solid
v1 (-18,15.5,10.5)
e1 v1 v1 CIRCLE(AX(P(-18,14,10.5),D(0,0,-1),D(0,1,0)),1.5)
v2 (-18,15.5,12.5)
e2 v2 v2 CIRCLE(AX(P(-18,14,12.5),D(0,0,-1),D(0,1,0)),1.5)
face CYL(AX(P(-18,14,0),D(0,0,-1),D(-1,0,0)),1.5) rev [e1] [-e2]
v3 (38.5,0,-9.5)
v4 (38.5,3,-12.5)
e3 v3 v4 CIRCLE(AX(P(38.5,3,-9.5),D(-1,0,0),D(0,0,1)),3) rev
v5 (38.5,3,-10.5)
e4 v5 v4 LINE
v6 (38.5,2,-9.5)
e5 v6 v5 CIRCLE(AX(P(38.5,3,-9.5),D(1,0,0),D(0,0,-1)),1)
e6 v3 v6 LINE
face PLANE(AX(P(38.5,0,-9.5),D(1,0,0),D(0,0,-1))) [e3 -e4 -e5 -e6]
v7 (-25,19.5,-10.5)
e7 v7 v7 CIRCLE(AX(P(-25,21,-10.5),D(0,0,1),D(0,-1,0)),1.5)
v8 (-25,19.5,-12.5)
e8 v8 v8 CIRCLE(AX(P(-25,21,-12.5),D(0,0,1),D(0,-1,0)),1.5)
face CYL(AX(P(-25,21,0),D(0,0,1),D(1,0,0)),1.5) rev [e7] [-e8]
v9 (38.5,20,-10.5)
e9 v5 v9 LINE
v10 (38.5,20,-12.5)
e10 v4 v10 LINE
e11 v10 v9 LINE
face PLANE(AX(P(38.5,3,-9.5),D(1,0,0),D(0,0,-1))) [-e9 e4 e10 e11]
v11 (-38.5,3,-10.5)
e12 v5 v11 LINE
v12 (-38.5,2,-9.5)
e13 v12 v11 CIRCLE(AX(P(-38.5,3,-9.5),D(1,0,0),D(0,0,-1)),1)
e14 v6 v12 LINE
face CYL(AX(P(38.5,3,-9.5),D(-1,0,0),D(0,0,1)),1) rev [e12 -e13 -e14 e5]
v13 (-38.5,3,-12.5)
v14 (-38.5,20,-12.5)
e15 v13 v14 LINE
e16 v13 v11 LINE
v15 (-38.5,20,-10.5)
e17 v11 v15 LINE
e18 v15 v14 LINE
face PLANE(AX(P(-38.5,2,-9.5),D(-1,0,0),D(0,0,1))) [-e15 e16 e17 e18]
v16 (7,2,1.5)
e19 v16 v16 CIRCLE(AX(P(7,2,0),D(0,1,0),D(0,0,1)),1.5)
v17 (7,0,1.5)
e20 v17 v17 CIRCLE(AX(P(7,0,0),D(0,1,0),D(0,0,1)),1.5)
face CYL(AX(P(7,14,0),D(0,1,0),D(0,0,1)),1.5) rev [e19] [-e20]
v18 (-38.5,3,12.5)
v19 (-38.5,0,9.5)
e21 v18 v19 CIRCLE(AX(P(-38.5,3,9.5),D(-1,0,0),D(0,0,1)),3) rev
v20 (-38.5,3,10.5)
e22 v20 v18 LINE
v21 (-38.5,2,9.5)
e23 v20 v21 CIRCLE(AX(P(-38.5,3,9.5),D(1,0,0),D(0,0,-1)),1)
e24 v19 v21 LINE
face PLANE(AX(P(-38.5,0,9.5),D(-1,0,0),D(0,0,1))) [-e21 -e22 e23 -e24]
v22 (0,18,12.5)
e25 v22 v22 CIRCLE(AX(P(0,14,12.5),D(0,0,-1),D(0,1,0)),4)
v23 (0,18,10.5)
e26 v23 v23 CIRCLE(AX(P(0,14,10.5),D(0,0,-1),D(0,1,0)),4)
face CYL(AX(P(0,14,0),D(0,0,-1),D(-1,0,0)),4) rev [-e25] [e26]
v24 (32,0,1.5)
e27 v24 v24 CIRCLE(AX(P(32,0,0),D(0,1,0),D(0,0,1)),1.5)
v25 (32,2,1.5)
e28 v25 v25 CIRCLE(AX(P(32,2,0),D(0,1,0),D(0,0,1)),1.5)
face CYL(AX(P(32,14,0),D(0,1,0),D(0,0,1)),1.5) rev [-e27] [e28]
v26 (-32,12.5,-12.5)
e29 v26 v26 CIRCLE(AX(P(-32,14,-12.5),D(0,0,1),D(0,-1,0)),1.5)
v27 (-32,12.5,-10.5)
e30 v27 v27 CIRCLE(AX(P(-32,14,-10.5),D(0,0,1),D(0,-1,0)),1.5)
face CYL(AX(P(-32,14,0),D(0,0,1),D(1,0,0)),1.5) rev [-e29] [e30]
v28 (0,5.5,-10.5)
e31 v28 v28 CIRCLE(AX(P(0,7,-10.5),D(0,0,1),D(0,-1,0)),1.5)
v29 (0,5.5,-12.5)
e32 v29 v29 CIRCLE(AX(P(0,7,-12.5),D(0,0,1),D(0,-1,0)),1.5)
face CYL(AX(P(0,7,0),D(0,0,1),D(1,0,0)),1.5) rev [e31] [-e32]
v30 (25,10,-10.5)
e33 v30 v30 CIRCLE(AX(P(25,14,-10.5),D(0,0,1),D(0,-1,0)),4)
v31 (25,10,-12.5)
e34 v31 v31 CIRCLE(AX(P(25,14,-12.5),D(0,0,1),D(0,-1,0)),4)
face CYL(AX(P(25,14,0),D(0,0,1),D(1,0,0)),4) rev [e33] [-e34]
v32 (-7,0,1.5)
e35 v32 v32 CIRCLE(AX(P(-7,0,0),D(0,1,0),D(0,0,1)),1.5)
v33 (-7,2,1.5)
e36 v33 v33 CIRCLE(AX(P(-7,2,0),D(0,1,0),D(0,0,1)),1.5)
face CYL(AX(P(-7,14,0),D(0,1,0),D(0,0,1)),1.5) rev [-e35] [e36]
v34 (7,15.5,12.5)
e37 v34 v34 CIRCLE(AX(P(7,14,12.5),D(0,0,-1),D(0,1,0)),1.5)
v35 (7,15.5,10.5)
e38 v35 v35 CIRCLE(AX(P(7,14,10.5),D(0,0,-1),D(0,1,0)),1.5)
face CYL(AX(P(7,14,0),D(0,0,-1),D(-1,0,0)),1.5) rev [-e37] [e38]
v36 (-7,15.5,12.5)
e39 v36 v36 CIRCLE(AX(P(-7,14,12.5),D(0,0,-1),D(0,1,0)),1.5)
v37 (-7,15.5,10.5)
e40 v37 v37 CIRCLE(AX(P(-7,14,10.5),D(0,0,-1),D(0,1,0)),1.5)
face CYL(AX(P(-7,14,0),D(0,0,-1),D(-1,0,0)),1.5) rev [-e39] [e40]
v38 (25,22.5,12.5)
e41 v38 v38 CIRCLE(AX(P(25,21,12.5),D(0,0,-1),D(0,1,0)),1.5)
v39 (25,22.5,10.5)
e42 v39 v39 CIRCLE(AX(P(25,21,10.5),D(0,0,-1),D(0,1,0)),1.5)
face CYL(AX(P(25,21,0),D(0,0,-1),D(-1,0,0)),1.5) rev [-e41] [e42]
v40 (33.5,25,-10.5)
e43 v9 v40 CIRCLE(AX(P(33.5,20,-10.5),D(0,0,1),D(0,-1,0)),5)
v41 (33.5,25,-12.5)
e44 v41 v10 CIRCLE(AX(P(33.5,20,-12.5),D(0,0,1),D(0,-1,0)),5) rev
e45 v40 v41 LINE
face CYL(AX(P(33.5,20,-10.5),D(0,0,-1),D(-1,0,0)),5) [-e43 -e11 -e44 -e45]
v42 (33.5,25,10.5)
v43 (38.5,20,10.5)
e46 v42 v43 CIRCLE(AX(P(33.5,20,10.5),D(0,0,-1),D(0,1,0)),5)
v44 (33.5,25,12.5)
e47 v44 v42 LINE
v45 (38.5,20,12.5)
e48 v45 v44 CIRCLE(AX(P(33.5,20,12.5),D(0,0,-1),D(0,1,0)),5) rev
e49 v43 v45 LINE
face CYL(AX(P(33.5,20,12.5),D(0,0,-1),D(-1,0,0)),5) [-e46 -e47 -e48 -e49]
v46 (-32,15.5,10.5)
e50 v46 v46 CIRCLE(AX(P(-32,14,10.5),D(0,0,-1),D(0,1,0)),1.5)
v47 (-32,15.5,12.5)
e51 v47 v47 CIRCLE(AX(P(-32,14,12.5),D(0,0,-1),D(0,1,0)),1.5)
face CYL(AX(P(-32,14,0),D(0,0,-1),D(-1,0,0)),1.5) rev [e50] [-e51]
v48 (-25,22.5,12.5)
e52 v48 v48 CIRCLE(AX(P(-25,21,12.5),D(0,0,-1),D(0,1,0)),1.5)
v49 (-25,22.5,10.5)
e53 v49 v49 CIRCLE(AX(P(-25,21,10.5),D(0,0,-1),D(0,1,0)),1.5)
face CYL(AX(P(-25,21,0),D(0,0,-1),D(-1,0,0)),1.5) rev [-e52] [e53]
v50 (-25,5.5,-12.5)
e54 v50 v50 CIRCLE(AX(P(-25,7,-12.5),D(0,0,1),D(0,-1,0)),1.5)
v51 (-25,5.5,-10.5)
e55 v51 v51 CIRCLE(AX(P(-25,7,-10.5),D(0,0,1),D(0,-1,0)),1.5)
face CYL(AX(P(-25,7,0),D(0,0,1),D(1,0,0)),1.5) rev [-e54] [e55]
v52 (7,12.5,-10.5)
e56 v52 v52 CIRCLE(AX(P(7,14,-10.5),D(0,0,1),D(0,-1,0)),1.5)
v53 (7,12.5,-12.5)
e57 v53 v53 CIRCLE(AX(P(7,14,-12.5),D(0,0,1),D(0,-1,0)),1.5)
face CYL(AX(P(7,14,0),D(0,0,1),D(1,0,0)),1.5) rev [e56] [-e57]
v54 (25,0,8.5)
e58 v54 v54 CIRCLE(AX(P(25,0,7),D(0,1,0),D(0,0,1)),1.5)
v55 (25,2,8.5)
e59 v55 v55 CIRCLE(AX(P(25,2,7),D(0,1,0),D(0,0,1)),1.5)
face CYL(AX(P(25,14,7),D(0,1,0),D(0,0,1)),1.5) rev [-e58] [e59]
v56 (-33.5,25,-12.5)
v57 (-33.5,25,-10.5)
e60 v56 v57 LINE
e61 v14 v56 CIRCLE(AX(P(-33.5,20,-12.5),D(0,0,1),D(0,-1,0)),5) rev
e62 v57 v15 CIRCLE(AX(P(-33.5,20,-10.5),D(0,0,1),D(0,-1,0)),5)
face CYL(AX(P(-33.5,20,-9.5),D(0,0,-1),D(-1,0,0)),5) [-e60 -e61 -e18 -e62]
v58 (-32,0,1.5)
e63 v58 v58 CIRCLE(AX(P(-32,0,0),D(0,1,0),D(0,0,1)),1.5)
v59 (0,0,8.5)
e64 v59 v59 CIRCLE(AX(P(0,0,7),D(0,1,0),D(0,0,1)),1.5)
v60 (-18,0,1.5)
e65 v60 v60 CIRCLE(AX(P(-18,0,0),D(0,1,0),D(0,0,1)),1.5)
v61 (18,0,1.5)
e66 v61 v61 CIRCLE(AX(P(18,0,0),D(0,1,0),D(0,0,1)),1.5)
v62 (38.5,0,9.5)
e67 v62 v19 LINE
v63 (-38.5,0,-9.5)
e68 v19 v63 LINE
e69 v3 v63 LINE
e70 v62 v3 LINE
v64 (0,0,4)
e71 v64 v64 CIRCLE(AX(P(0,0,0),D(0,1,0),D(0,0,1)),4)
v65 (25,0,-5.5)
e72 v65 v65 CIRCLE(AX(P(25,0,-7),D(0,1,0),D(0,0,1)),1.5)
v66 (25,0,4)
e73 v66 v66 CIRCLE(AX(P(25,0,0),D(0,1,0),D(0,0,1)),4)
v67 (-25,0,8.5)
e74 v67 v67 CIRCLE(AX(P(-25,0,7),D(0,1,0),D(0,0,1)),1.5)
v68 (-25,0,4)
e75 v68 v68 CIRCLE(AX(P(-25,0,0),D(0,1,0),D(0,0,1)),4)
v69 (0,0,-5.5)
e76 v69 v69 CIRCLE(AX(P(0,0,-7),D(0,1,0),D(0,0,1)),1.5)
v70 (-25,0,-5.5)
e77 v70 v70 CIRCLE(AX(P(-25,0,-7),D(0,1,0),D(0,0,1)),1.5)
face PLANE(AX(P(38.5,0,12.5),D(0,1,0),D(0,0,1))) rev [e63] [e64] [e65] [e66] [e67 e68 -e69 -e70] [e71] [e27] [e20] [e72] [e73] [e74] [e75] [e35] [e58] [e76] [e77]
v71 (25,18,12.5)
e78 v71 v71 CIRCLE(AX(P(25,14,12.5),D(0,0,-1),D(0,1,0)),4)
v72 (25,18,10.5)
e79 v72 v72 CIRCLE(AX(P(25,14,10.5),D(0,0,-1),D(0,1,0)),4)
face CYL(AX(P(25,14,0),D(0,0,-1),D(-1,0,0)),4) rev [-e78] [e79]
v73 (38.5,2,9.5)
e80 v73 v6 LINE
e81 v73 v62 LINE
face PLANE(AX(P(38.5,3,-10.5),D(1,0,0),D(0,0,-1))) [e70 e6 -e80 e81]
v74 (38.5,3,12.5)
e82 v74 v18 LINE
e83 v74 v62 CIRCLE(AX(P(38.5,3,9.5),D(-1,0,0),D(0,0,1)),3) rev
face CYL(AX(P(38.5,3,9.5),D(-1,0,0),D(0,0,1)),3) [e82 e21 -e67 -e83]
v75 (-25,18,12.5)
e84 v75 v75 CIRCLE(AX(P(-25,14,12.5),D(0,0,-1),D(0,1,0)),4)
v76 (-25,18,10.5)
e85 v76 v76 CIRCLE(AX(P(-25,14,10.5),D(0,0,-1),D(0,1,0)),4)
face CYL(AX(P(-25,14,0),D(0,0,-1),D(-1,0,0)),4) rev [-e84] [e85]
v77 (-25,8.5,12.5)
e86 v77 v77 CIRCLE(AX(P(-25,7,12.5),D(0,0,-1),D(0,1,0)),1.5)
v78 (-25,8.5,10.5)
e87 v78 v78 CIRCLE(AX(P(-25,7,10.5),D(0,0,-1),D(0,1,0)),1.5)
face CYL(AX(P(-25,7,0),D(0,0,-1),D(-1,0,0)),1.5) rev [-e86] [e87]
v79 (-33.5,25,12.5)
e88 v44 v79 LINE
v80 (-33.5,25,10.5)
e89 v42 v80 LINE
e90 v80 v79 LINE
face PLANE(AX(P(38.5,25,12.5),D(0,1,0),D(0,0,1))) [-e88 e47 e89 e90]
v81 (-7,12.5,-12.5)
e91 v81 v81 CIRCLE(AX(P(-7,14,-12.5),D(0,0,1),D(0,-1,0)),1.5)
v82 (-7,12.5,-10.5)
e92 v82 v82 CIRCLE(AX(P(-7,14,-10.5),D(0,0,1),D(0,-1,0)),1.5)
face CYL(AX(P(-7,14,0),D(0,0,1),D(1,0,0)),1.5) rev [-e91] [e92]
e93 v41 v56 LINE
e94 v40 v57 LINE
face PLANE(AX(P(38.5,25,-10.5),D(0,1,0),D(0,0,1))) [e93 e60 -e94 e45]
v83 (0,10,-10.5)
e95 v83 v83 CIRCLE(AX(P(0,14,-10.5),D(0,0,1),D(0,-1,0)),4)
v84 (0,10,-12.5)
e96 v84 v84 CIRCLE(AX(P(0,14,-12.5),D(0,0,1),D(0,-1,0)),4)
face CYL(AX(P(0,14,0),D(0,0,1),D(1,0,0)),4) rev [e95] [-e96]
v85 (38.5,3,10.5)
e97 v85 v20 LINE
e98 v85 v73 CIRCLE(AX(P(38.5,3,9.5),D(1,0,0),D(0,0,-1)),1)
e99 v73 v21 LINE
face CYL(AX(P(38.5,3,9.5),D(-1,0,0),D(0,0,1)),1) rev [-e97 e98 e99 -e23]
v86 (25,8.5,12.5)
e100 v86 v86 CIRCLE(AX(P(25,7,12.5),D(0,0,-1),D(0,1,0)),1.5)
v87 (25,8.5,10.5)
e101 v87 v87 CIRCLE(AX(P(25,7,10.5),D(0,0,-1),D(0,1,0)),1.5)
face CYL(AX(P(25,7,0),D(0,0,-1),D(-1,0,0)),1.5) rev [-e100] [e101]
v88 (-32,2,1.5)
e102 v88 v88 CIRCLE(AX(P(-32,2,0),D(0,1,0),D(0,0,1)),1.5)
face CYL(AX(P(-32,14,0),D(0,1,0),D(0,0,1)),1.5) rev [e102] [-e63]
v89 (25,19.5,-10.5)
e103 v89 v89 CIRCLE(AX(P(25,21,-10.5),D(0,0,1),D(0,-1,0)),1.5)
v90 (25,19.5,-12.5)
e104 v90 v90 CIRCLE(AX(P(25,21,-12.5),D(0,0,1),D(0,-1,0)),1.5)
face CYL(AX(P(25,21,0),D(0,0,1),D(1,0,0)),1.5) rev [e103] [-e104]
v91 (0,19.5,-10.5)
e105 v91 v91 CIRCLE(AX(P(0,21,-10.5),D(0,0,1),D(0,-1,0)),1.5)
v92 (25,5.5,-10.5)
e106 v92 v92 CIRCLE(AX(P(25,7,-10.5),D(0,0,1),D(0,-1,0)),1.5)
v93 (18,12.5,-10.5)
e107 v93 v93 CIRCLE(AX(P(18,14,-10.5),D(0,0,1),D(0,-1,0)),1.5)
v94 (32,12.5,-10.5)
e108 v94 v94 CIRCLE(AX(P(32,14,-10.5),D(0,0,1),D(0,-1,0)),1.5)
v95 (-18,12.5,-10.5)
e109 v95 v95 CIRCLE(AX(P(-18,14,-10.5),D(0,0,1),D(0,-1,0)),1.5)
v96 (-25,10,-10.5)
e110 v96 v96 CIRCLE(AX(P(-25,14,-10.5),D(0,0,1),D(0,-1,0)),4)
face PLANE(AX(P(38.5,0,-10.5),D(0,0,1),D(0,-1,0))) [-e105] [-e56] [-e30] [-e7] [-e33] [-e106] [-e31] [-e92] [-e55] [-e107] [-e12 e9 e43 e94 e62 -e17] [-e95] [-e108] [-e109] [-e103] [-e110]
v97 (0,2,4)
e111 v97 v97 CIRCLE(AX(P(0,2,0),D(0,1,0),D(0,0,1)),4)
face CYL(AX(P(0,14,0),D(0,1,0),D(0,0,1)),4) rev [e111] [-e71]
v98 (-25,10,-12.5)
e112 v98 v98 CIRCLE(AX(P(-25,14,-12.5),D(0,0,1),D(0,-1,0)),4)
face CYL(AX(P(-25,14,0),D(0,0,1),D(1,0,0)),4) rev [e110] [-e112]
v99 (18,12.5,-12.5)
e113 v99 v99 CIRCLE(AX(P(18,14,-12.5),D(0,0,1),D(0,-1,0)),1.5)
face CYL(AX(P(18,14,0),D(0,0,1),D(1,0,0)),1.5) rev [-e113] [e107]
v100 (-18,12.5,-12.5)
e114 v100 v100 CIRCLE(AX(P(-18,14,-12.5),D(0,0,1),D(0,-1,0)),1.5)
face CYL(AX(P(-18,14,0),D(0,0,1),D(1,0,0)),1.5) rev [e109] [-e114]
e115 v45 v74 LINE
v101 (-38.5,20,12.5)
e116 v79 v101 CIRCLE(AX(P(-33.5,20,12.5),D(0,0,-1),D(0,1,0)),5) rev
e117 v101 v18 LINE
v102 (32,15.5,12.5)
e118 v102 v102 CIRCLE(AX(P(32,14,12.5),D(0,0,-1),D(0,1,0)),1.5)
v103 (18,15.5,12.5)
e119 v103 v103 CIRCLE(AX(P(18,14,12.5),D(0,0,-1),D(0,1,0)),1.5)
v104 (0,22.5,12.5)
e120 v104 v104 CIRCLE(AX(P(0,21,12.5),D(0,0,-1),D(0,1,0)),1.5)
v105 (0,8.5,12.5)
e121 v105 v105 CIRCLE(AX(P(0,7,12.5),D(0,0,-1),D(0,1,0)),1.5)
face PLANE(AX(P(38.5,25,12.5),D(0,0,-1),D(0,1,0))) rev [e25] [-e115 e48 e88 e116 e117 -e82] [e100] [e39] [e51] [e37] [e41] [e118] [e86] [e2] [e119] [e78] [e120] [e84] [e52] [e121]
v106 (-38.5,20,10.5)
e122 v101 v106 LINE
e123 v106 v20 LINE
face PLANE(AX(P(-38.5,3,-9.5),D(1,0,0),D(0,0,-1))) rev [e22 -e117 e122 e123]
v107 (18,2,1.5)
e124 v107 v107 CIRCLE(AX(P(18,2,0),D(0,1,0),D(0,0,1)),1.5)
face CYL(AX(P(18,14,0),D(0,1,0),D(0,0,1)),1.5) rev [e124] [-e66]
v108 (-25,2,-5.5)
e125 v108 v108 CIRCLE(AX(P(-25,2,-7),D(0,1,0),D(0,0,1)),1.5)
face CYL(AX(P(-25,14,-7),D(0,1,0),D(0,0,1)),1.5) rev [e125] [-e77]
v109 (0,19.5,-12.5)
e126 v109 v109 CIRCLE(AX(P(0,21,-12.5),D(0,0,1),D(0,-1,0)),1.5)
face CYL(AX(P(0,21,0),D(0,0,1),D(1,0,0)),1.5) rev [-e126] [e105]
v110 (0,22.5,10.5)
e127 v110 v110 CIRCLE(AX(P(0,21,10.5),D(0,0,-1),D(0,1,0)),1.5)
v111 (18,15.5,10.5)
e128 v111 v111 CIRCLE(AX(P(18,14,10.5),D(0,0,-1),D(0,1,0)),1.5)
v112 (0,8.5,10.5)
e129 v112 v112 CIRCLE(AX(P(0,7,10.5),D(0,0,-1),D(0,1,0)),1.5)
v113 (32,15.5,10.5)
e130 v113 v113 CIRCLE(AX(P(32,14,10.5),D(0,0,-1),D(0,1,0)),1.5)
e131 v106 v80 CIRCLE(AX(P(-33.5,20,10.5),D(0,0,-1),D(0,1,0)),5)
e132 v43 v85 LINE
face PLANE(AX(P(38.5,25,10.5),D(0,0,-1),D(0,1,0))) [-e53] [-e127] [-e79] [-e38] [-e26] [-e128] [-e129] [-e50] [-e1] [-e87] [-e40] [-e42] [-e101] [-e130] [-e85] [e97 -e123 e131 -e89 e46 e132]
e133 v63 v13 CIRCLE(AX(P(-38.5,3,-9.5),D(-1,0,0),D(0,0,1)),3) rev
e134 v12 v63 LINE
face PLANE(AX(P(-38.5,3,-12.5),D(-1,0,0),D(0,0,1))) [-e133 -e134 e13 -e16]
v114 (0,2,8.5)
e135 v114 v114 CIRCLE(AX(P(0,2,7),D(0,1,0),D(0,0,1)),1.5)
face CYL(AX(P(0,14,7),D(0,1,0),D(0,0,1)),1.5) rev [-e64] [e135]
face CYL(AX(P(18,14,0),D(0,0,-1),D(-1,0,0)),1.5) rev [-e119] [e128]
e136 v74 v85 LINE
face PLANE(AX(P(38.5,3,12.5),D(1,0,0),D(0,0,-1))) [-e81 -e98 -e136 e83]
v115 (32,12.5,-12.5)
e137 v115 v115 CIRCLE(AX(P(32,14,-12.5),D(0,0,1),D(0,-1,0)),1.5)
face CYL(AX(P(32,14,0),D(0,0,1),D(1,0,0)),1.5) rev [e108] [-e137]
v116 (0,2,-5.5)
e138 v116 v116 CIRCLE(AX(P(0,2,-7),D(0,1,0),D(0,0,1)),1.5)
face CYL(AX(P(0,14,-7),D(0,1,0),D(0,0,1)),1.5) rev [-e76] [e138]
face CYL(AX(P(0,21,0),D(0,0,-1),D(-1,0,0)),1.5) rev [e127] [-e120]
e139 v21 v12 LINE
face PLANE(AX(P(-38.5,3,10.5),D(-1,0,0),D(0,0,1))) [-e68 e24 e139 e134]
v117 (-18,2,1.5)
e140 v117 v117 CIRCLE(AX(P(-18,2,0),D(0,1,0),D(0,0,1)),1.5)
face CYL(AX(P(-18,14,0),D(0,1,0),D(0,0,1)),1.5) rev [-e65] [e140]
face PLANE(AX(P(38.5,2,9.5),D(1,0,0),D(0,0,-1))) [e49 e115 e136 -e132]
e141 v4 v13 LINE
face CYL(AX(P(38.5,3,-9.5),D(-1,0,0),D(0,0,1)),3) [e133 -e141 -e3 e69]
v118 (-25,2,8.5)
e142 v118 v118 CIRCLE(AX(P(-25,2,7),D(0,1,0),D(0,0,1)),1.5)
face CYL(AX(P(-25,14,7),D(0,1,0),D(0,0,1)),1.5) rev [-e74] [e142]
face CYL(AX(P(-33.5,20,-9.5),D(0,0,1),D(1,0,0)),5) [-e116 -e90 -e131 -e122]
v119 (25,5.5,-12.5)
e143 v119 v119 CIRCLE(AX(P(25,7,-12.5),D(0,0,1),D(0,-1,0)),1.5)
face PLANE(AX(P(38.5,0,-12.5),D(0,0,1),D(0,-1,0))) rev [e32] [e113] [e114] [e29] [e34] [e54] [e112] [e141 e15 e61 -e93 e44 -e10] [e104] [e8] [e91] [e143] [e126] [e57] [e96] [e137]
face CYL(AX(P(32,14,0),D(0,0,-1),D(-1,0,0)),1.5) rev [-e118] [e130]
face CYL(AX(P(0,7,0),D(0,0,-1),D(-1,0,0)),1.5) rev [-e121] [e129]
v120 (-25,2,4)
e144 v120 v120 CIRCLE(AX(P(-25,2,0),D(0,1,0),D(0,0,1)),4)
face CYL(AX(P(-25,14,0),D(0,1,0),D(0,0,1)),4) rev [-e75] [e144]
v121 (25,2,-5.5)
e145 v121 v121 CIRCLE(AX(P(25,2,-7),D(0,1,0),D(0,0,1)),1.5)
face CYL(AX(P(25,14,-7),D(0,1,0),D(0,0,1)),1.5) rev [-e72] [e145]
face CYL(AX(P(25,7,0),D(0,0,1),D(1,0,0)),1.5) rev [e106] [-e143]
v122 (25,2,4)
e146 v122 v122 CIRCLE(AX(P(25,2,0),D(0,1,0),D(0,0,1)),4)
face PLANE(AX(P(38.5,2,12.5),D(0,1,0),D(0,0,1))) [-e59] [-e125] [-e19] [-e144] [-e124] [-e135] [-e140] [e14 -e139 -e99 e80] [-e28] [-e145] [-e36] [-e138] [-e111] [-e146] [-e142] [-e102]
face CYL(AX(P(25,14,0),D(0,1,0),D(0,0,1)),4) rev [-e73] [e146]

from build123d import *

# Parameters (mm, degrees)
T_LE_DE_BASE_PLI_E1_DEPTH              = 38.5
ESQUISSE7_W                            = 4
ESQUISSE7_H                            = 12.501
ESQUISSE12_W                           = 1.5
ESQUISSE12_H                           = 12.501
DIAM_TRE_DU_PER_AGE_3_0_3_1_AT_2_COUNT = 2
DIAM_TRE_DU_PER_AGE_3_0_3_1_AT_2_PITCH = 9.899494937
DIAM_TRE_DU_PER_AGE_3_0_3_1_AT_3_COUNT = 2
DIAM_TRE_DU_PER_AGE_3_0_3_1_AT_3_PITCH = 14
DIAM_TRE_DU_PER_AGE_3_0_3_1_AT_4_COUNT = 2
DIAM_TRE_DU_PER_AGE_3_0_3_1_AT_4_PITCH = 9.899494937
R_P_TITION_START                       = 10.5
R_P_TITION_CIRCULAIRE1_OUTLINE_R       = 4
R_P_TITION_CIRCULAIRE1_OUTLINE_R_2     = 1.5
R_P_TITION_CIRCULAIRE1_DEPTH           = 2
R_P_TITION_CIRCULAIRE1_2_OUTLINE_R     = 4
R_P_TITION_CIRCULAIRE1_2_OUTLINE_R_2   = 1.5
R_P_TITION_CIRCULAIRE1_2_DEPTH         = 2
R_P_TITION_LIN_AIRE1_COUNT             = 3
R_P_TITION_LIN_AIRE1_PITCH             = 25
R_P_TITION_LIN_AIRE1_COPY_1_SKETCH_W   = 1.5
R_P_TITION_LIN_AIRE1_COPY_1_SKETCH_H   = 12.501
R_P_TITION_LIN_AIRE1_COPY_2_SKETCH_W   = 1.5
R_P_TITION_LIN_AIRE1_COPY_2_SKETCH_H   = 12.501
R_P_TITION_LIN_AIRE1_COPY_3_SKETCH_W   = 1.5
R_P_TITION_LIN_AIRE1_COPY_3_SKETCH_H   = 12.501
R_P_TITION_LIN_AIRE1_COPY_4_SKETCH_W   = 1.5
R_P_TITION_LIN_AIRE1_COPY_4_SKETCH_H   = 12.501
R_P_TITION_LIN_AIRE1_COPY_5_SKETCH_W   = 1.5
R_P_TITION_LIN_AIRE1_COPY_5_SKETCH_H   = 12.501
R_P_TITION_LIN_AIRE1_COPY_6_SKETCH_W   = 1.5
R_P_TITION_LIN_AIRE1_COPY_6_SKETCH_H   = 12.501
CONG_1_R                               = 5


# Read off the part's stored shape, not the designer's step: Répétition circulaire1
# Sheet-metal steps are written as plain solids
with BuildPart() as part:
    # Esquisse1 → Tôle de base pliée1 (new, symmetric)
    with BuildSketch(Plane(origin=(0, 0, 0), x_dir=(0, 0, -1), z_dir=(1, 0, 0))):
        with BuildLine():
            Line((-12.5, 25), (-12.5, 3))
            ThreePointArc((-12.5, 3), (-11.621320344, 0.878679656), (-9.5, 0))
            Line((-9.5, 0), (9.5, 0))
            ThreePointArc((9.5, 0), (11.621320344, 0.878679656), (12.5, 3))
            Line((12.5, 3), (12.5, 25))
            Line((12.5, 25), (10.5, 25))
            Line((10.5, 25), (10.5, 3))
            ThreePointArc((10.5, 3), (10.207106781, 2.292893219), (9.5, 2))
            Line((9.5, 2), (-9.5, 2))
            ThreePointArc((-9.5, 2), (-10.207106781, 2.292893219), (-10.5, 3))
            Line((-10.5, 3), (-10.5, 25))
            Line((-10.5, 25), (-12.5, 25))
        make_face()
    extrude(amount=T_LE_DE_BASE_PLI_E1_DEPTH, both=True)

    # Esquisse7 → Diamètre du perçage Ø8.0 (8)1 (revolve, cut)
    with BuildSketch(Plane(origin=(25, 14, 0), x_dir=(0, -1, 0), z_dir=(1, 0, 0))):
        with Locations((2, 6.2505)):
            Rectangle(ESQUISSE7_W, ESQUISSE7_H)
    diam_tre_du_per_age_8_0_8_1 = revolve(axis=Axis((25, 14, 6.35), (0, 0, -1)), mode=Mode.SUBTRACT)

    # Esquisse12 → Diamètre du perçage Ø3.0 (3)1 (revolve, cut)
    with BuildSketch(Plane(origin=(25, 21, 0), x_dir=(0, -1, 0), z_dir=(1, 0, 0))):
        with Locations((0.75, 6.2505)):
            Rectangle(ESQUISSE12_W, ESQUISSE12_H)
    diam_tre_du_per_age_3_0_3_1 = revolve(axis=Axis((25, 21, 6.35), (0, 0, -1)), mode=Mode.SUBTRACT)

    # Diamètre du perçage Ø3.0 (3)1 at 2: Diamètre du perçage Ø3.0 (3)1 ×2
    with Locations(*[Vector(-0.7071067811865475, -0.7071067811865478, 0) * (i * DIAM_TRE_DU_PER_AGE_3_0_3_1_AT_2_PITCH) for i in range(1, DIAM_TRE_DU_PER_AGE_3_0_3_1_AT_2_COUNT)]):
        add(diam_tre_du_per_age_3_0_3_1, mode=Mode.SUBTRACT)

    # Diamètre du perçage Ø3.0 (3)1 at 3: Diamètre du perçage Ø3.0 (3)1 ×2
    with Locations(*[(0, -i * DIAM_TRE_DU_PER_AGE_3_0_3_1_AT_3_PITCH, 0) for i in range(1, DIAM_TRE_DU_PER_AGE_3_0_3_1_AT_3_COUNT)]):
        add(diam_tre_du_per_age_3_0_3_1, mode=Mode.SUBTRACT)

    # Diamètre du perçage Ø3.0 (3)1 at 4: Diamètre du perçage Ø3.0 (3)1 ×2
    with Locations(*[Vector(0.7071067811865476, -0.7071067811865476, 0) * (i * DIAM_TRE_DU_PER_AGE_3_0_3_1_AT_4_PITCH) for i in range(1, DIAM_TRE_DU_PER_AGE_3_0_3_1_AT_4_COUNT)]):
        add(diam_tre_du_per_age_3_0_3_1, mode=Mode.SUBTRACT)

    # Répétition circulaire1 outline → Répétition circulaire1 (cut)
    with BuildSketch(Plane.XY.offset(R_P_TITION_START)):
        with Locations((25, 14)):
            Circle(R_P_TITION_CIRCULAIRE1_OUTLINE_R)
        with Locations((32, 14)):
            Circle(R_P_TITION_CIRCULAIRE1_OUTLINE_R_2)
        with Locations((25, 7)):
            Circle(R_P_TITION_CIRCULAIRE1_OUTLINE_R_2)
        with Locations((18, 14)):
            Circle(R_P_TITION_CIRCULAIRE1_OUTLINE_R_2)
        with Locations((25, 21)):
            Circle(R_P_TITION_CIRCULAIRE1_OUTLINE_R_2)
    r_p_tition_circulaire1 = extrude(amount=R_P_TITION_CIRCULAIRE1_DEPTH, mode=Mode.SUBTRACT)

    # R_p_tition circulaire1 2 outline → R_p_tition circulaire1 2 (cut)
    with BuildSketch(Plane(origin=(0, 0, 0), x_dir=(1, 0, 0), z_dir=(0, 1, 0))):
        with Locations((25, 0)):
            Circle(R_P_TITION_CIRCULAIRE1_2_OUTLINE_R)
        with Locations((32, 0)):
            Circle(R_P_TITION_CIRCULAIRE1_2_OUTLINE_R_2)
        with Locations((25, -7)):
            Circle(R_P_TITION_CIRCULAIRE1_2_OUTLINE_R_2)
        with Locations((18, 0)):
            Circle(R_P_TITION_CIRCULAIRE1_2_OUTLINE_R_2)
        with Locations((25, 7)):
            Circle(R_P_TITION_CIRCULAIRE1_2_OUTLINE_R_2)
    r_p_tition_circulaire1_2 = extrude(amount=R_P_TITION_CIRCULAIRE1_2_DEPTH, mode=Mode.SUBTRACT)

    # Répétition linéaire1: Diamètre du perçage Ø8.0 (8)1, Diamètre du perçage Ø3.0 (3)1, Répétition circulaire1, R_p_tition circulaire1 2 ×3
    with Locations(*[(-i * R_P_TITION_LIN_AIRE1_PITCH, 0, 0) for i in range(1, R_P_TITION_LIN_AIRE1_COUNT)]):
        add(diam_tre_du_per_age_8_0_8_1, mode=Mode.SUBTRACT)
        add(diam_tre_du_per_age_3_0_3_1, mode=Mode.SUBTRACT)
        add(r_p_tition_circulaire1, mode=Mode.SUBTRACT)
        add(r_p_tition_circulaire1_2, mode=Mode.SUBTRACT)

    # Répétition linéaire1 copy 1 sketch → Répétition linéaire1 copy 1 (revolve, cut)
    with BuildSketch(Plane(origin=(-7, 14, 0), x_dir=(0, -1, 0), z_dir=(1, 0, 0))):
        with Locations((0.75, 6.2505)):
            Rectangle(R_P_TITION_LIN_AIRE1_COPY_1_SKETCH_W, R_P_TITION_LIN_AIRE1_COPY_1_SKETCH_H)
    revolve(axis=Axis((-7, 14, 6.35), (0, 0, -1)), mode=Mode.SUBTRACT)

    # Répétition linéaire1 copy 2 sketch → Répétition linéaire1 copy 2 (revolve, cut)
    with BuildSketch(Plane(origin=(-32, 14, 0), x_dir=(0, -1, 0), z_dir=(1, 0, 0))):
        with Locations((0.75, 6.2505)):
            Rectangle(R_P_TITION_LIN_AIRE1_COPY_2_SKETCH_W, R_P_TITION_LIN_AIRE1_COPY_2_SKETCH_H)
    revolve(axis=Axis((-32, 14, 6.35), (0, 0, -1)), mode=Mode.SUBTRACT)

    # Répétition linéaire1 copy 3 sketch → Répétition linéaire1 copy 3 (revolve, cut)
    with BuildSketch(Plane(origin=(0, 7, 0), x_dir=(0, -1, 0), z_dir=(1, 0, 0))):
        with Locations((0.75, 6.2505)):
            Rectangle(R_P_TITION_LIN_AIRE1_COPY_3_SKETCH_W, R_P_TITION_LIN_AIRE1_COPY_3_SKETCH_H)
    revolve(axis=Axis((0, 7, 6.35), (0, 0, -1)), mode=Mode.SUBTRACT)

    # Répétition linéaire1 copy 4 sketch → Répétition linéaire1 copy 4 (revolve, cut)
    with BuildSketch(Plane(origin=(-25, 7, 0), x_dir=(0, -1, 0), z_dir=(1, 0, 0))):
        with Locations((0.75, 6.2505)):
            Rectangle(R_P_TITION_LIN_AIRE1_COPY_4_SKETCH_W, R_P_TITION_LIN_AIRE1_COPY_4_SKETCH_H)
    revolve(axis=Axis((-25, 7, 6.35), (0, 0, -1)), mode=Mode.SUBTRACT)

    # Répétition linéaire1 copy 5 sketch → Répétition linéaire1 copy 5 (revolve, cut)
    with BuildSketch(Plane(origin=(7, 14, 0), x_dir=(0, -1, 0), z_dir=(1, 0, 0))):
        with Locations((0.75, 6.2505)):
            Rectangle(R_P_TITION_LIN_AIRE1_COPY_5_SKETCH_W, R_P_TITION_LIN_AIRE1_COPY_5_SKETCH_H)
    revolve(axis=Axis((7, 14, 6.35), (0, 0, -1)), mode=Mode.SUBTRACT)

    # Répétition linéaire1 copy 6 sketch → Répétition linéaire1 copy 6 (revolve, cut)
    with BuildSketch(Plane(origin=(-18, 14, 0), x_dir=(0, -1, 0), z_dir=(1, 0, 0))):
        with Locations((0.75, 6.2505)):
            Rectangle(R_P_TITION_LIN_AIRE1_COPY_6_SKETCH_W, R_P_TITION_LIN_AIRE1_COPY_6_SKETCH_H)
    revolve(axis=Axis((-18, 14, 6.35), (0, 0, -1)), mode=Mode.SUBTRACT)

    # Congé1
    cong_1_edges = [part.edges().sort_by_distance(p)[0] for p in [
        (-38.5, 25, 11.5),
        (-38.5, 25, -11.5),
        (38.5, 25, 11.5),
        (38.5, 25, -11.5),
    ]]
    fillet(cong_1_edges, radius=CONG_1_R)


solid = part.part
